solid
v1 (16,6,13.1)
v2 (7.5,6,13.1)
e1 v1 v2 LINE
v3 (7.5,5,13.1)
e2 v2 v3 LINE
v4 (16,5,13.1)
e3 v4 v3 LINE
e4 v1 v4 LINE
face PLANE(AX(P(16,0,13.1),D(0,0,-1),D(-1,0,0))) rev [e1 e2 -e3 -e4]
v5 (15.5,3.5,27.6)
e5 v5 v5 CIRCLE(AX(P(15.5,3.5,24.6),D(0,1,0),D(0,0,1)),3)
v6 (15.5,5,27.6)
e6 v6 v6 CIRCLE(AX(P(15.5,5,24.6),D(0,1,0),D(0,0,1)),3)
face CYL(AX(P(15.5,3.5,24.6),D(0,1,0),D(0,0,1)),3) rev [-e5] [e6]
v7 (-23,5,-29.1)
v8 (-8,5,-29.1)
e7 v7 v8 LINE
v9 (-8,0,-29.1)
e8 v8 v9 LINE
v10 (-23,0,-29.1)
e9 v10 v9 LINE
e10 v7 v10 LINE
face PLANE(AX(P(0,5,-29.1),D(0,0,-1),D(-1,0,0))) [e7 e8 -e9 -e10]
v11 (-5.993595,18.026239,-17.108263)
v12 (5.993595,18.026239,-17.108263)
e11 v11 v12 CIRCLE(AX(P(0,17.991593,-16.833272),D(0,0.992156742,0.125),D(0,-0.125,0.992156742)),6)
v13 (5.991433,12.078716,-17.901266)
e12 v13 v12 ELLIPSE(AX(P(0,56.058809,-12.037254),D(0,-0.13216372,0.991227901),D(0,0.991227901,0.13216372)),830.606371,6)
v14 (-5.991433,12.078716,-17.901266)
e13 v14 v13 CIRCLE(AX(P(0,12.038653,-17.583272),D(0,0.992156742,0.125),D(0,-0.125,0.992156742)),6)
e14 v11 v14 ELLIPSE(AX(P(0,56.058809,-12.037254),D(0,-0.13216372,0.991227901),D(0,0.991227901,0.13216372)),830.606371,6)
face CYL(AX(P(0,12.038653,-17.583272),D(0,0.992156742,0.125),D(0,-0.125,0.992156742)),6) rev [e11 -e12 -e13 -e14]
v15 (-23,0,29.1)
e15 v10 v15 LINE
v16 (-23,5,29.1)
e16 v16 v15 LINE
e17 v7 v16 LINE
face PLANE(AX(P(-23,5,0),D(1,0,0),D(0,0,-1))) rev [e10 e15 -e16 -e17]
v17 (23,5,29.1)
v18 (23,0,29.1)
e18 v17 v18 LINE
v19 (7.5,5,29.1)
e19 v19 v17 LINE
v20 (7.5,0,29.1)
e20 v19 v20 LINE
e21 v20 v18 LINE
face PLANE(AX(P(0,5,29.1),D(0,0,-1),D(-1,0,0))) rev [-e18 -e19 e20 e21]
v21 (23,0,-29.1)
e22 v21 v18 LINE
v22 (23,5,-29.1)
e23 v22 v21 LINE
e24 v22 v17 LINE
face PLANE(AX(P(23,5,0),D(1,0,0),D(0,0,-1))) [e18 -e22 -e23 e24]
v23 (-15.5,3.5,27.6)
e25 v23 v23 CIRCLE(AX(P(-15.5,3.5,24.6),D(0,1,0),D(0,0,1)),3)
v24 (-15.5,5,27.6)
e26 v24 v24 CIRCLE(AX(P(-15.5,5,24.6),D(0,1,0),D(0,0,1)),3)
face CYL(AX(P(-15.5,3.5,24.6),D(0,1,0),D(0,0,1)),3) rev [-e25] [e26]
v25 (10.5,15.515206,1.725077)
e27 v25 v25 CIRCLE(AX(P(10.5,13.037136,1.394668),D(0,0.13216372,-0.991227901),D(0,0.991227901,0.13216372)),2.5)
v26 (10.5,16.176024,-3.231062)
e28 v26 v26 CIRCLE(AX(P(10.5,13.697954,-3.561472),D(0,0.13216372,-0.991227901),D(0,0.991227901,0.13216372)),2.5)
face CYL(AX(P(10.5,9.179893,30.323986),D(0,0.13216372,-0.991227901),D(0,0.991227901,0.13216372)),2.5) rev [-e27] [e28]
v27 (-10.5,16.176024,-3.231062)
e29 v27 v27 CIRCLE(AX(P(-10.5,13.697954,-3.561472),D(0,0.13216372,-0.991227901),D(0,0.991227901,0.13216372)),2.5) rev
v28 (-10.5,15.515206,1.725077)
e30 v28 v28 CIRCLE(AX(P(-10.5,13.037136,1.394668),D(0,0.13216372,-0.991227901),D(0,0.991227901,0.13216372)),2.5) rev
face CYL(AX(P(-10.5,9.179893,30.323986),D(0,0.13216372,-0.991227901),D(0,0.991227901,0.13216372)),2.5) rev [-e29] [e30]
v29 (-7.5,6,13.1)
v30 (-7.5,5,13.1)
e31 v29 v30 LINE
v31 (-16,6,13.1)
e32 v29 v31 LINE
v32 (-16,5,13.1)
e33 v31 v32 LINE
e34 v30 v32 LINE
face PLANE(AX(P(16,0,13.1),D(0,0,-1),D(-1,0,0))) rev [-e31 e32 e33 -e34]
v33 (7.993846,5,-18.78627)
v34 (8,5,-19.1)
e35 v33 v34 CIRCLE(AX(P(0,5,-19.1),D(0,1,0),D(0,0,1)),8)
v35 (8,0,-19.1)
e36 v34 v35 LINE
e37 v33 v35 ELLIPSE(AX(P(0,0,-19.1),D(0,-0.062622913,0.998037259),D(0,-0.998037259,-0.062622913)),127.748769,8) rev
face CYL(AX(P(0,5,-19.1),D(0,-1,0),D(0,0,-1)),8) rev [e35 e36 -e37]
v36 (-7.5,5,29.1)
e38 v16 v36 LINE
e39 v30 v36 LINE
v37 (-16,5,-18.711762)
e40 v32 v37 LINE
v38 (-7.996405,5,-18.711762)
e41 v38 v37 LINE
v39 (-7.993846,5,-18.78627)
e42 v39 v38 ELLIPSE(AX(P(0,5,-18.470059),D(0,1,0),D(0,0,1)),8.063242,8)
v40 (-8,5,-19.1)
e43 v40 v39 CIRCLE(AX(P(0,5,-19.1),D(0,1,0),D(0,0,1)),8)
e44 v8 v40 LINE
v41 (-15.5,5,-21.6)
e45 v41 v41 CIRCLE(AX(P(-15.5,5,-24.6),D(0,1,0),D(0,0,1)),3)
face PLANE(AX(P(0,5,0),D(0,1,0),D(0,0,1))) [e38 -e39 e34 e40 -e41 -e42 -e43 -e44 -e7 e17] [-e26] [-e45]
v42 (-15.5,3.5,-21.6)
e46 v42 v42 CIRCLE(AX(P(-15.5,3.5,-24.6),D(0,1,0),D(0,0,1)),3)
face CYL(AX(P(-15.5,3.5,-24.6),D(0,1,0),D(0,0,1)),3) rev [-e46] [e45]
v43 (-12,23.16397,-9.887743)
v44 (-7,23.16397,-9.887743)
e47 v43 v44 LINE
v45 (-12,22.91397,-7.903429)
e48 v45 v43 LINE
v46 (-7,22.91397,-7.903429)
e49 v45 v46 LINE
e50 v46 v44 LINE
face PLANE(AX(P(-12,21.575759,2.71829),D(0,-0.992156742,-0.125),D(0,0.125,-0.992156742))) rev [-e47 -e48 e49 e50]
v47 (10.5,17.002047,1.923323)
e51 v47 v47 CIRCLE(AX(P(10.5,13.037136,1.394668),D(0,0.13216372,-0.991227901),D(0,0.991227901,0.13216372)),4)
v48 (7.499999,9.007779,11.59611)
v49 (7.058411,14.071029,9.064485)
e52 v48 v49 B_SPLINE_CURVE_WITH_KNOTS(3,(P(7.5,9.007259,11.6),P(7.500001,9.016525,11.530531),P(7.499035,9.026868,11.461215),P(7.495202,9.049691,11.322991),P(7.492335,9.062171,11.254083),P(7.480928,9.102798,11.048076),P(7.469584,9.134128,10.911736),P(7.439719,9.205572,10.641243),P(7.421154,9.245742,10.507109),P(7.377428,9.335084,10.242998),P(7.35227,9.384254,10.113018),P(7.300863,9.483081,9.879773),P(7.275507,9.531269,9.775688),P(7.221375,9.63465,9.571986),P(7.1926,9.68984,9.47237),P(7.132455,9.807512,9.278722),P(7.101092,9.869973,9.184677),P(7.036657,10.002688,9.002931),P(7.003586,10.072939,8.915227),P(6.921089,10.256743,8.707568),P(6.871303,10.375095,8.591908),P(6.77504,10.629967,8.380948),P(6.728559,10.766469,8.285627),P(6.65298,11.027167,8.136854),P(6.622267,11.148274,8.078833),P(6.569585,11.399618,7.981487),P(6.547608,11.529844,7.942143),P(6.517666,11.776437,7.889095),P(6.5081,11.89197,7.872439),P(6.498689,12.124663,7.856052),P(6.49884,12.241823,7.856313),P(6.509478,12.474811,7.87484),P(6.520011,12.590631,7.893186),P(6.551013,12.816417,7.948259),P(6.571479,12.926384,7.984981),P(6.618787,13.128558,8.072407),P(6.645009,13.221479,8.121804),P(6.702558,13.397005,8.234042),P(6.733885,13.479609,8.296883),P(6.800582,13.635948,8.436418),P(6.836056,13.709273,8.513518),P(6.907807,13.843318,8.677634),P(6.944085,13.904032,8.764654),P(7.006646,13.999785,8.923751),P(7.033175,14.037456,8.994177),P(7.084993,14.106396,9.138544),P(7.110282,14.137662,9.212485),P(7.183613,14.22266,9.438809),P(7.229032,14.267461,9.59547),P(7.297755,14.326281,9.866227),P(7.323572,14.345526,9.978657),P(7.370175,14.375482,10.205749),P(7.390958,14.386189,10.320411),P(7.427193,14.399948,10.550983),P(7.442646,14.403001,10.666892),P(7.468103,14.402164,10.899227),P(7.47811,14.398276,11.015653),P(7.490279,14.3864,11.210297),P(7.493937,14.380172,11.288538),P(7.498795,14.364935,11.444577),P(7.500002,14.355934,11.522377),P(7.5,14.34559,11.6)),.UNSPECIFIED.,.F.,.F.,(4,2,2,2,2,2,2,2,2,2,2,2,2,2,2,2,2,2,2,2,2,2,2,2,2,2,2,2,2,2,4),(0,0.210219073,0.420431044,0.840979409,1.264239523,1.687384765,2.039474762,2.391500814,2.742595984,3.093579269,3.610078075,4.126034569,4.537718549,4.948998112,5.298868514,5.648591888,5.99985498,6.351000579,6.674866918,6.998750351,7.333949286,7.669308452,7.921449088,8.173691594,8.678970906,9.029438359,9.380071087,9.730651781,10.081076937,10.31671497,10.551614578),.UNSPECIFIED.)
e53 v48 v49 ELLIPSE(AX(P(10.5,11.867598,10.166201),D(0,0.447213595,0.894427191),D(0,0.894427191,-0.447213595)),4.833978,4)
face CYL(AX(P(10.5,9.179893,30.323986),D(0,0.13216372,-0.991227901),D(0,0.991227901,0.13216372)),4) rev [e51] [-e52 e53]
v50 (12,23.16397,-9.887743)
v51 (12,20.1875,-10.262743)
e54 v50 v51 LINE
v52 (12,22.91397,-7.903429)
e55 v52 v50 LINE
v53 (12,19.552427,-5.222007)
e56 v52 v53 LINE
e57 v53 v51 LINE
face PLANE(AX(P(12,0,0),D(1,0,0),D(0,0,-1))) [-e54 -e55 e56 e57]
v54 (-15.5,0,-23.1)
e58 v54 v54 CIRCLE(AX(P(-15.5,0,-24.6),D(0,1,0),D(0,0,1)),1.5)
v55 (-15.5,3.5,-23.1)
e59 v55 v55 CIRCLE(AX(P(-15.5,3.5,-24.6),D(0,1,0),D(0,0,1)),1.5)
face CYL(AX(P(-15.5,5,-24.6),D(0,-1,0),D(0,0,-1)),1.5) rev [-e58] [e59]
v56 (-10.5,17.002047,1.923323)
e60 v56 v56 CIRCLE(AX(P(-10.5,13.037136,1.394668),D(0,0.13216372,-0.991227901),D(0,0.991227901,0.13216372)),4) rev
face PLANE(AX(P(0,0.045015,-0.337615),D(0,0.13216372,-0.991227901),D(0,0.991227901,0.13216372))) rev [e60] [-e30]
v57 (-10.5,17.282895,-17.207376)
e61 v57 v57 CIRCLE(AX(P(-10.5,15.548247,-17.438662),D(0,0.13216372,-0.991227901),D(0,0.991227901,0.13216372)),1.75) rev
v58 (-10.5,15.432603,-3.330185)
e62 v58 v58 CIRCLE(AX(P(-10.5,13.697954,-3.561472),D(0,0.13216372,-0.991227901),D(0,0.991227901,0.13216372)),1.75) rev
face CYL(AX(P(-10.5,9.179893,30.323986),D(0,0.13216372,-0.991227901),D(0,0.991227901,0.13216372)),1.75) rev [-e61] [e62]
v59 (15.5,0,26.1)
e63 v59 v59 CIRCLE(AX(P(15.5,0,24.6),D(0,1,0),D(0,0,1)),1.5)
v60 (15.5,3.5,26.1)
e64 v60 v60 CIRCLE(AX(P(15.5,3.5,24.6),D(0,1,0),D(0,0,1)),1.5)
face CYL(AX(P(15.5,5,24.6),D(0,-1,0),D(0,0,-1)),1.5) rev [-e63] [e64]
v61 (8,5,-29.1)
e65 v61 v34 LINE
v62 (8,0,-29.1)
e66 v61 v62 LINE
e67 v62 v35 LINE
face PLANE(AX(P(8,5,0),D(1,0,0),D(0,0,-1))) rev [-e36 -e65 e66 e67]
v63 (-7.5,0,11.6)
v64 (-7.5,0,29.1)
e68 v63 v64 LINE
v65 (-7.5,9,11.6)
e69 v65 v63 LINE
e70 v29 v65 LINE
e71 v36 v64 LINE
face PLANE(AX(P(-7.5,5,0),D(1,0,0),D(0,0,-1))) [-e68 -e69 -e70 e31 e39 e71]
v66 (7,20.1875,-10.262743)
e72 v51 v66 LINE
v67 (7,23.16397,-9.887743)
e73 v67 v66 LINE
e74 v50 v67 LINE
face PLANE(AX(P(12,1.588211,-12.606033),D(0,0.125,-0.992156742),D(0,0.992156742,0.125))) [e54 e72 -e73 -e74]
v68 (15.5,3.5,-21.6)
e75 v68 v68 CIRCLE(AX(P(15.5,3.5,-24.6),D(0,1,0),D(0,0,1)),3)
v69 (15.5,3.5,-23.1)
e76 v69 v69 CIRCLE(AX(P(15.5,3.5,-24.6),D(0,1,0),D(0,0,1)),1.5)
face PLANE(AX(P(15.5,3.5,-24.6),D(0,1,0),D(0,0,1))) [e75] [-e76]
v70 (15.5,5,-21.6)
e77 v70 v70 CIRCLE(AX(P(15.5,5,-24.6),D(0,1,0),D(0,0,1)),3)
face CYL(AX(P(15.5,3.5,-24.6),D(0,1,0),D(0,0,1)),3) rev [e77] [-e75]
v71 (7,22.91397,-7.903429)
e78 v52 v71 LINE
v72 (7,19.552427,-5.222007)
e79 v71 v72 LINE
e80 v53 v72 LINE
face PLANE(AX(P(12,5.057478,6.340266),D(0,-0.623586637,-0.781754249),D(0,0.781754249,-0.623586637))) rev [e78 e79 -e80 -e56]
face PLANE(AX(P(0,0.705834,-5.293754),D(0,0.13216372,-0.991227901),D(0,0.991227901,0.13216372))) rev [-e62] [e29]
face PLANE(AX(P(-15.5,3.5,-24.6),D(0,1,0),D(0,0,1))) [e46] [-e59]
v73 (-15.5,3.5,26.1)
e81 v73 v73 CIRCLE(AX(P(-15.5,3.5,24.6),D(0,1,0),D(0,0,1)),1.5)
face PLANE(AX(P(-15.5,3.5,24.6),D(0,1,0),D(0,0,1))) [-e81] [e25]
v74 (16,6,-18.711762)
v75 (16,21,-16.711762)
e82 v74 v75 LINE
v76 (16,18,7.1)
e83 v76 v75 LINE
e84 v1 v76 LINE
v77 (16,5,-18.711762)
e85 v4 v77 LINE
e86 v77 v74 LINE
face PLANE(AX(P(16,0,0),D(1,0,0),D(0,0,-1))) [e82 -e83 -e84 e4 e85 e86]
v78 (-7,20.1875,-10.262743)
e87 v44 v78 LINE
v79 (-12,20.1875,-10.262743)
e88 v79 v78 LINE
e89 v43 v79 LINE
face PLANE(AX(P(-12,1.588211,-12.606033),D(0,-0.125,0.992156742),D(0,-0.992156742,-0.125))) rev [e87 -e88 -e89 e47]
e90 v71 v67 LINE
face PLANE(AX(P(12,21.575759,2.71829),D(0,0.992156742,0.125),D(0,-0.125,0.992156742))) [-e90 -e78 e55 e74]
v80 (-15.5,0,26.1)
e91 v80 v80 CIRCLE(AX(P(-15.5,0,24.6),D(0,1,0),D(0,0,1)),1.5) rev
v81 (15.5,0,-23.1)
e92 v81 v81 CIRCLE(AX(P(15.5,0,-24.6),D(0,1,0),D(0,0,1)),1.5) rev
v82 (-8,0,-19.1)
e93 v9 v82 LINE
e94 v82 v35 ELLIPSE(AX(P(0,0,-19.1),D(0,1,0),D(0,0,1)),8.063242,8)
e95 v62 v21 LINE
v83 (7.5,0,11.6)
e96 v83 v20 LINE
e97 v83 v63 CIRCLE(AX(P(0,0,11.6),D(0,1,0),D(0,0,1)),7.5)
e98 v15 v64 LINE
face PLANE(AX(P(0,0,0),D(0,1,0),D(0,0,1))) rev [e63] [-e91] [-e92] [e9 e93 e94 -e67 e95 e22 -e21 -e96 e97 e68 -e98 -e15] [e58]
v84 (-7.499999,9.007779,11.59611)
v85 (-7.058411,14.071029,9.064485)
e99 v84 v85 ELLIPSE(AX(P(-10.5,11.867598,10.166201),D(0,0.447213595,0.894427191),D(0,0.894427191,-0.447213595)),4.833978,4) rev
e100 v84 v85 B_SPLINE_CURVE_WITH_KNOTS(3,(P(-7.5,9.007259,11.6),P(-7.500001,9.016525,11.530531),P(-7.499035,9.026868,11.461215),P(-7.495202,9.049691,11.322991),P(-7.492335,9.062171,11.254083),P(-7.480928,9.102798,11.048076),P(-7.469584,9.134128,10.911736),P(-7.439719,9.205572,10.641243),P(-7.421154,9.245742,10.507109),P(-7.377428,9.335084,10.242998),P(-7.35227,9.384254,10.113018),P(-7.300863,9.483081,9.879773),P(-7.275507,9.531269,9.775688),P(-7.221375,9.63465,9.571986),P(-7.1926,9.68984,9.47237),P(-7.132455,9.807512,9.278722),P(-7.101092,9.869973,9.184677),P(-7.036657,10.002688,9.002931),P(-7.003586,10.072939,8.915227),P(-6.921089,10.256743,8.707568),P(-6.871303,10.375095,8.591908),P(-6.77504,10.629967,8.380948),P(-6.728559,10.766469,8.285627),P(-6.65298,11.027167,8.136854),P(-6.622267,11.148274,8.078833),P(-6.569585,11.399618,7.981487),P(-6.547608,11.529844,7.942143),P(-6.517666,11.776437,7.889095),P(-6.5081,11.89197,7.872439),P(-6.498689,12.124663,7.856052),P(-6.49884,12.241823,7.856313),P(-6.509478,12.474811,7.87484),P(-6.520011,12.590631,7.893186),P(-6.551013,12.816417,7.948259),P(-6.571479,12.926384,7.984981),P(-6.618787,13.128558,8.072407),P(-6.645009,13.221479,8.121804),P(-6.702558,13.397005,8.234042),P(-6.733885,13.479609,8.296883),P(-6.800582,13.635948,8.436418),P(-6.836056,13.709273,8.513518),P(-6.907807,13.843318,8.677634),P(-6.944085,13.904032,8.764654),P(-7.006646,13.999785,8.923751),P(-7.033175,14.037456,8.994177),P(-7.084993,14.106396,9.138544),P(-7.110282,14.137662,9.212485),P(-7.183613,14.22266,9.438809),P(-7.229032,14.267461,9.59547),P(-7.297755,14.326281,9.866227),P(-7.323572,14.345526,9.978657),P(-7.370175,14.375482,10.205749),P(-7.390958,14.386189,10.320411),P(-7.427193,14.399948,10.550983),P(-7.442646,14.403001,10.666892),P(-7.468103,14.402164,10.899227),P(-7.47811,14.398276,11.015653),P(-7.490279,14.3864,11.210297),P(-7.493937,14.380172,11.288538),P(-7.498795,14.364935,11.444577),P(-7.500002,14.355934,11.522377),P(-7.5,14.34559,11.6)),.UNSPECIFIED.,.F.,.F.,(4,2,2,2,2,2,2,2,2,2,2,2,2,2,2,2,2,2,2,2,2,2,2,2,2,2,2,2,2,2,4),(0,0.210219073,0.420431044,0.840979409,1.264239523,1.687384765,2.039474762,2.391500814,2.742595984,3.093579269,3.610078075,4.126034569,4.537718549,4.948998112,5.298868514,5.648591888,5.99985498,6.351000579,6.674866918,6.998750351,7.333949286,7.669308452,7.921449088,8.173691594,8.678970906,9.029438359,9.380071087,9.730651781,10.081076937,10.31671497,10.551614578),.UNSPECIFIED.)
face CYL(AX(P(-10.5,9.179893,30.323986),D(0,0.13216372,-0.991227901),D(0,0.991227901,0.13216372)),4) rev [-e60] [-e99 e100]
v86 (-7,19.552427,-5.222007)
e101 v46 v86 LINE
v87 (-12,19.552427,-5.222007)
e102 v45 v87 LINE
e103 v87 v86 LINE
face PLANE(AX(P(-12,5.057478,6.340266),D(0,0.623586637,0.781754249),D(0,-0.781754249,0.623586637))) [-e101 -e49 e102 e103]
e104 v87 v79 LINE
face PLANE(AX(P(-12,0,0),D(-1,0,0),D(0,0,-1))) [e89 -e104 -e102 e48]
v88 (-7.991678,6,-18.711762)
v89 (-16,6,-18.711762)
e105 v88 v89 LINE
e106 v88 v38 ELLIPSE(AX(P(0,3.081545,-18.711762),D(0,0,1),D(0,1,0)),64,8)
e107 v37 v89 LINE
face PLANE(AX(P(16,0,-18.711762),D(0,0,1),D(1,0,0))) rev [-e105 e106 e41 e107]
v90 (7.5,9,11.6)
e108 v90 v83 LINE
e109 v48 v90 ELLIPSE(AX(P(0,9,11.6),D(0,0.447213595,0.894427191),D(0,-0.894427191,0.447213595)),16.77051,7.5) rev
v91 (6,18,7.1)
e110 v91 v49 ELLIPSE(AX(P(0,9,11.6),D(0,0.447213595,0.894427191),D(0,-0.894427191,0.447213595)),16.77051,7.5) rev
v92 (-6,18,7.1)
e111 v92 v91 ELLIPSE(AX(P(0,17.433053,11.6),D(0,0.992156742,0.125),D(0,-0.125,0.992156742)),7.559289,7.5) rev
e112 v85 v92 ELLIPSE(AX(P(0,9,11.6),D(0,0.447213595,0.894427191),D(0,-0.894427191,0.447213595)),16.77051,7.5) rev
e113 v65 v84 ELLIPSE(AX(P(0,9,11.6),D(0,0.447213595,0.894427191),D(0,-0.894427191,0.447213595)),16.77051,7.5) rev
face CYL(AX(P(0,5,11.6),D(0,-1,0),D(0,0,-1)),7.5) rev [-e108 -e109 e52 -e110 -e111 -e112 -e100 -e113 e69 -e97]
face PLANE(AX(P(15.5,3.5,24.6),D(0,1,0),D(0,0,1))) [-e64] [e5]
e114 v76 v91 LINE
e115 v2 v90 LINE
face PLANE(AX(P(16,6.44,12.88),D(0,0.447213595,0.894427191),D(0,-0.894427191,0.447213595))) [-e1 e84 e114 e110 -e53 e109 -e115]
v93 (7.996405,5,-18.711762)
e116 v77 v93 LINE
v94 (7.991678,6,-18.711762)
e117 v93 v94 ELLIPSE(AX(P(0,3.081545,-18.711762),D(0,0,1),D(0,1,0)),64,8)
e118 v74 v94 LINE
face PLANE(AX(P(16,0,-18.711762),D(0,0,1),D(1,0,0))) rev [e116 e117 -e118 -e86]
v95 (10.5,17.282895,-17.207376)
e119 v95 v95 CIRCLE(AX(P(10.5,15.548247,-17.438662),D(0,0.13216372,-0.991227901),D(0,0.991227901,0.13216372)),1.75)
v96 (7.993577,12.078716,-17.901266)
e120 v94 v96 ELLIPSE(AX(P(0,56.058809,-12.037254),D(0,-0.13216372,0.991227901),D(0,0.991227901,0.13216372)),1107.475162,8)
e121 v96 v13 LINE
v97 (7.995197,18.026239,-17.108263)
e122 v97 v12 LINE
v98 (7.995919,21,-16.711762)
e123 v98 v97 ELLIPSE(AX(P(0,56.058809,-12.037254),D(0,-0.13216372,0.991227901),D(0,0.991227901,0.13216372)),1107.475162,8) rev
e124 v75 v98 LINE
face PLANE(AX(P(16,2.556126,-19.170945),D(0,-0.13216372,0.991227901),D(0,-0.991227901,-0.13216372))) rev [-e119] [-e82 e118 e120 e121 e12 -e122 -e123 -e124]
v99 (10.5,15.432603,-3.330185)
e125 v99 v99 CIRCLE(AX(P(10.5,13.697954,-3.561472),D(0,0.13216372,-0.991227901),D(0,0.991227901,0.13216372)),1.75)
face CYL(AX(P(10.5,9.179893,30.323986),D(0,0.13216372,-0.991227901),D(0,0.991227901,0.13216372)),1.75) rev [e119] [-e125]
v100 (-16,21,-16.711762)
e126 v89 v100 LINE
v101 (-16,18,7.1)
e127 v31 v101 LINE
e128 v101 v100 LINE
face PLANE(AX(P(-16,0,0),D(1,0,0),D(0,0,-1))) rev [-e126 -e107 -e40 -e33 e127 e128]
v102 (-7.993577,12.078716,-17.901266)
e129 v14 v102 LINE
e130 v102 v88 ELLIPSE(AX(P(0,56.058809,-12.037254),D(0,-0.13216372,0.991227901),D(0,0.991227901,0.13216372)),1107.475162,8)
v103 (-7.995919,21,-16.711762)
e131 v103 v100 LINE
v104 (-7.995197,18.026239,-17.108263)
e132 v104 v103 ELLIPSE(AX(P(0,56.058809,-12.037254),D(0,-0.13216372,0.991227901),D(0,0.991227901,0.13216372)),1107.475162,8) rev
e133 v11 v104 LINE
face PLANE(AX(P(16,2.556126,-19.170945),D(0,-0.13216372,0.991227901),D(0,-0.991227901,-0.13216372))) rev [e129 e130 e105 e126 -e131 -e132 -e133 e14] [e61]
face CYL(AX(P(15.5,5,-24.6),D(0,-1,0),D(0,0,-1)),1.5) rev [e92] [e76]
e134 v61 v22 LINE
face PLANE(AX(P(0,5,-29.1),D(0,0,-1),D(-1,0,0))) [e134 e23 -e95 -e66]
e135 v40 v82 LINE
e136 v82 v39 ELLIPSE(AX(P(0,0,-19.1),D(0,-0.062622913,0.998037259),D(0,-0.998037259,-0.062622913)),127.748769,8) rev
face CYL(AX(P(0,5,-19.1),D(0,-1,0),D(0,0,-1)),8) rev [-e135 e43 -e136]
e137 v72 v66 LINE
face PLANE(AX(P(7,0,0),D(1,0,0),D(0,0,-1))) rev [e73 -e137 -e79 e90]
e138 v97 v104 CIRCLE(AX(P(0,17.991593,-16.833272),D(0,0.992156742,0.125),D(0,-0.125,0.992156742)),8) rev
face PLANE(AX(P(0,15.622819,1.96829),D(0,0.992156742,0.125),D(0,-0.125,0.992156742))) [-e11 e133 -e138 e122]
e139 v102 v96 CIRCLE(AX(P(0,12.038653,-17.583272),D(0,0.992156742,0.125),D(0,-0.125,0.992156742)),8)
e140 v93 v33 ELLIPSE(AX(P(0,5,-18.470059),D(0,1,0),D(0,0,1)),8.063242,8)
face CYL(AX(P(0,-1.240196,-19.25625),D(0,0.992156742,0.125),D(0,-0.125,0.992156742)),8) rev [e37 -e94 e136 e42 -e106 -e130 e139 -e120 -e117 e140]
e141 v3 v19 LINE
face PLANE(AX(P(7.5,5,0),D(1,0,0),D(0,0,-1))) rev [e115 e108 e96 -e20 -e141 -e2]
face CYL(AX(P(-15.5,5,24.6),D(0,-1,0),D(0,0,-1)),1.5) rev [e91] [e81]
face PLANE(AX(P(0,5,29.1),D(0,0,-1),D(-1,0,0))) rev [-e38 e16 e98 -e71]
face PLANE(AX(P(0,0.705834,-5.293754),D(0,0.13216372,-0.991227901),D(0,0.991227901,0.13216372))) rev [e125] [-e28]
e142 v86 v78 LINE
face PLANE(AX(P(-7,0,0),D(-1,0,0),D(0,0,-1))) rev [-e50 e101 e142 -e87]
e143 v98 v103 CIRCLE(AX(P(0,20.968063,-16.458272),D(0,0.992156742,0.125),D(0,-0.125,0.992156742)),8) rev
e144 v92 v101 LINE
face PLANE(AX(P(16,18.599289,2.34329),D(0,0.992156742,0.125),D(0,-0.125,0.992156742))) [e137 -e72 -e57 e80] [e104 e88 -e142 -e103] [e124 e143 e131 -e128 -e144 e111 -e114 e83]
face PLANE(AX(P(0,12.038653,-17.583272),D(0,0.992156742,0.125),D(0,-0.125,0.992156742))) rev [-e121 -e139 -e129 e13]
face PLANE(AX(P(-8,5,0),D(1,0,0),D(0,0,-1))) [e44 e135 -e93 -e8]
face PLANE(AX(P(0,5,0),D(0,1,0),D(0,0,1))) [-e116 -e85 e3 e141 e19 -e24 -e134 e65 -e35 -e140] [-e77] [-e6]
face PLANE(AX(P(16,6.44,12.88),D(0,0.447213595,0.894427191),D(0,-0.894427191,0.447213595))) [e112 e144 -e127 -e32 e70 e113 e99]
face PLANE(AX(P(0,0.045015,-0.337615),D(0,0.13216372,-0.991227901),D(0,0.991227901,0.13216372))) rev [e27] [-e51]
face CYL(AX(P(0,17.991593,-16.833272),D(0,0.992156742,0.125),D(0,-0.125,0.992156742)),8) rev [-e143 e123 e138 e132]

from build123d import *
from build123d.topology import SkipClean

# Parameters (mm, degrees)
SKETCH1_R           = 3
SKETCH1_R_2         = 1.5
BOSS_EXTRUDE1_DEPTH = 5
CUT_EXTRUDE1_START  = 3.5
SKETCH1_3_R         = 3
SKETCH1_3_R_2       = 1.5
CUT_EXTRUDE1_DEPTH  = 1.5
BOSS_EXTRUDE2_DEPTH = 16
BOSS_EXTRUDE3_START = 7
BOSS_EXTRUDE3_DEPTH = 5
SKETCH3_R           = 1.75
CUT_EXTRUDE2_DEPTH  = 58.304165422
CUT_EXTRUDE3_START  = -14
SKETCH3_3_R         = 2.5
SKETCH3_3_R_2       = 1.75
CUT_EXTRUDE3_DEPTH  = 44.304165422
CUT_EXTRUDE4_START  = -19
SKETCH3_4_R         = 4
SKETCH3_4_R_2       = 2.5
CUT_EXTRUDE4_DEPTH  = 39.304165422
CUT_EXTRUDE5_DEPTH  = 44.730761674
CUT_EXTRUDE6_DEPTH  = 3
CUT_EXTRUDE7_START  = 3
CUT_EXTRUDE7_DEPTH  = 6
CUT_EXTRUDE8_START  = 9
CUT_EXTRUDE8_DEPTH  = 12.133821


with BuildPart() as part:
    # Sketch1 → Boss-Extrude1 (new body)
    # profile 1 of 5: a face of its own
    with BuildSketch(Plane(origin=(0, 0, 0), x_dir=(1, 0, 0), z_dir=(0, 1, 0))):
        with BuildLine():
            ThreePointArc((7.5, -11.6), (0, -4.1), (-7.5, -11.6))
            Line((-7.5, -11.6), (-7.5, -29.1))
            Line((-7.5, -29.1), (-23, -29.1))
            Line((-23, -29.1), (-23, 29.1))
            Line((-23, 29.1), (-8, 29.1))
            Line((-8, 29.1), (-8, 19.1))
            ThreePointArc((-8, 19.1), (0, 11.1), (8, 19.1))
            Line((8, 19.1), (8, 29.1))
            Line((8, 29.1), (23, 29.1))
            Line((23, 29.1), (23, -29.1))
            Line((23, -29.1), (7.5, -29.1))
            Line((7.5, -29.1), (7.5, -11.6))
        make_face()
        with Locations((15.5, -24.6)):
            Circle(SKETCH1_R, mode=Mode.SUBTRACT)
        with Locations((-15.5, 24.6)):
            Circle(SKETCH1_R, mode=Mode.SUBTRACT)
        with Locations((-15.5, -24.6)):
            Circle(SKETCH1_R, mode=Mode.SUBTRACT)
        with Locations((15.5, 24.6)):
            Circle(SKETCH1_R, mode=Mode.SUBTRACT)
    # profile 2 of 5: a face of its own
    with BuildSketch(Plane(origin=(0, 0, 0), x_dir=(1, 0, 0), z_dir=(0, 1, 0))):
        with Locations((-15.5, -24.6)):
            Circle(SKETCH1_R)
        with Locations(Location((-15.5, -24.6, 0), (0, 0, 270))):
            Circle(SKETCH1_R_2, mode=Mode.SUBTRACT)
    # profile 3 of 5: a face of its own
    with BuildSketch(Plane(origin=(0, 0, 0), x_dir=(1, 0, 0), z_dir=(0, 1, 0))):
        with Locations((15.5, -24.6)):
            Circle(SKETCH1_R)
        with Locations(Location((15.5, -24.6, 0), (0, 0, 270))):
            Circle(SKETCH1_R_2, mode=Mode.SUBTRACT)
    # profile 4 of 5: a face of its own
    with BuildSketch(Plane(origin=(0, 0, 0), x_dir=(1, 0, 0), z_dir=(0, 1, 0))):
        with Locations((15.5, 24.6)):
            Circle(SKETCH1_R)
        with Locations(Location((15.5, 24.6, 0), (0, 0, 270))):
            Circle(SKETCH1_R_2, mode=Mode.SUBTRACT)
    # profile 5 of 5: a face of its own
    with BuildSketch(Plane(origin=(0, 0, 0), x_dir=(1, 0, 0), z_dir=(0, 1, 0))):
        with Locations((-15.5, 24.6)):
            Circle(SKETCH1_R)
        with Locations(Location((-15.5, 24.6, 0), (0, 0, 270))):
            Circle(SKETCH1_R_2, mode=Mode.SUBTRACT)
    extrude(amount=BOSS_EXTRUDE1_DEPTH)

    # Sketch1<3> → Cut-Extrude1 (cut)
    # profile 1 of 4: a face of its own
    with BuildSketch(Plane(origin=(0, 0, 0), x_dir=(1, 0, 0), z_dir=(0, 1, 0)).offset(CUT_EXTRUDE1_START)):
        with Locations(Location((-15.5, -24.6, 0), (0, 0, 270))):
            Circle(SKETCH1_3_R)
        with Locations(Location((-15.5, -24.6, 0), (0, 0, 270))):
            Circle(SKETCH1_3_R_2, mode=Mode.SUBTRACT)
    # profile 2 of 4: a face of its own
    with BuildSketch(Plane(origin=(0, 0, 0), x_dir=(1, 0, 0), z_dir=(0, 1, 0)).offset(CUT_EXTRUDE1_START)):
        with Locations(Location((15.5, -24.6, 0), (0, 0, 270))):
            Circle(SKETCH1_3_R)
        with Locations(Location((15.5, -24.6, 0), (0, 0, 270))):
            Circle(SKETCH1_3_R_2, mode=Mode.SUBTRACT)
    # profile 3 of 4: a face of its own
    with BuildSketch(Plane(origin=(0, 0, 0), x_dir=(1, 0, 0), z_dir=(0, 1, 0)).offset(CUT_EXTRUDE1_START)):
        with Locations(Location((15.5, 24.6, 0), (0, 0, 270))):
            Circle(SKETCH1_3_R)
        with Locations(Location((15.5, 24.6, 0), (0, 0, 270))):
            Circle(SKETCH1_3_R_2, mode=Mode.SUBTRACT)
    # profile 4 of 4: a face of its own
    with BuildSketch(Plane(origin=(0, 0, 0), x_dir=(1, 0, 0), z_dir=(0, 1, 0)).offset(CUT_EXTRUDE1_START)):
        with Locations(Location((-15.5, 24.6, 0), (0, 0, 270))):
            Circle(SKETCH1_3_R)
        with Locations(Location((-15.5, 24.6, 0), (0, 0, 270))):
            Circle(SKETCH1_3_R_2, mode=Mode.SUBTRACT)
    extrude(amount=CUT_EXTRUDE1_DEPTH, mode=Mode.SUBTRACT)

    # Sketch2 → Boss-Extrude2 (add, symmetric)
    with BuildSketch(Plane(origin=(0, 0, 0), x_dir=(0, 0, -1), z_dir=(1, 0, 0))):
        Polygon((-13.1, 6), (-13.1, 5), (18.7117618, 5), (18.7117618, 6), (16.7117618, 21), (-7.1, 18), align=None)
    extrude(amount=BOSS_EXTRUDE2_DEPTH, both=True)

    # Sketch2<3> → Boss-Extrude3 (add)
    with BuildSketch(Plane(origin=(0, 0, 0), x_dir=(0, 0, -1), z_dir=(1, 0, 0)).offset(BOSS_EXTRUDE3_START)):
        Polygon((7.903429496, 22.913970225), (5.222006954, 19.552426955), (10.262742979, 20.1875), (9.887742979, 23.163970225), align=None)
    boss_extrude3 = extrude(amount=BOSS_EXTRUDE3_DEPTH)

    # Mirror1: Boss-Extrude3 across plane
    add(boss_extrude3.mirror(Plane(origin=(0, 0, 0), x_dir=(0, 0, 1), z_dir=(1, 0, 0))))

    # Sketch3 → Cut-Extrude2 (cut, through all)
    with BuildSketch(Plane(origin=(0, 2.556126, -19.170945), x_dir=(-1, 0, 0), z_dir=(0, 0.13216372009101815, -0.9912279006826348))):
        with Locations(Location((10.5, 13.107097306, 0), (0, 0, 90))):
            Circle(SKETCH3_R)
        with Locations(Location((-10.5, 13.107097306, 0), (0, 0, 90))):
            Circle(SKETCH3_R)
    extrude(amount=-CUT_EXTRUDE2_DEPTH, mode=Mode.SUBTRACT)

    # Sketch3<3> → Cut-Extrude3 (cut, through all)
    # profile 1 of 2: a face of its own
    with BuildSketch(Plane(origin=(0, 2.556126, -19.170945), x_dir=(-1, 0, 0), z_dir=(0, 0.13216372009101815, -0.9912279006826348)).offset(CUT_EXTRUDE3_START)):
        with Locations(Location((10.5, 13.107097306, 0), (0, 0, 90))):
            Circle(SKETCH3_3_R)
        with Locations(Location((10.5, 13.107097306, 0), (0, 0, 90))):
            Circle(SKETCH3_3_R_2, mode=Mode.SUBTRACT)
    # profile 2 of 2: a face of its own
    with BuildSketch(Plane(origin=(0, 2.556126, -19.170945), x_dir=(-1, 0, 0), z_dir=(0, 0.13216372009101815, -0.9912279006826348)).offset(CUT_EXTRUDE3_START)):
        with Locations(Location((-10.5, 13.107097306, 0), (0, 0, 90))):
            Circle(SKETCH3_3_R)
        with Locations(Location((-10.5, 13.107097306, 0), (0, 0, 90))):
            Circle(SKETCH3_3_R_2, mode=Mode.SUBTRACT)
    extrude(amount=-CUT_EXTRUDE3_DEPTH, mode=Mode.SUBTRACT)

    # Sketch3<4> → Cut-Extrude4 (cut, through all)
    # profile 1 of 2: a face of its own
    with BuildSketch(Plane(origin=(0, 2.556126, -19.170945), x_dir=(-1, 0, 0), z_dir=(0, 0.13216372009101815, -0.9912279006826348)).offset(CUT_EXTRUDE4_START)):
        with Locations(Location((10.5, 13.107097306, 0), (0, 0, 90))):
            Circle(SKETCH3_4_R)
        with Locations(Location((10.5, 13.107097306, 0), (0, 0, 90))):
            Circle(SKETCH3_4_R_2, mode=Mode.SUBTRACT)
    # profile 2 of 2: a face of its own
    with BuildSketch(Plane(origin=(0, 2.556126, -19.170945), x_dir=(-1, 0, 0), z_dir=(0, 0.13216372009101815, -0.9912279006826348)).offset(CUT_EXTRUDE4_START)):
        with Locations(Location((-10.5, 13.107097306, 0), (0, 0, 90))):
            Circle(SKETCH3_4_R)
        with Locations(Location((-10.5, 13.107097306, 0), (0, 0, 90))):
            Circle(SKETCH3_4_R_2, mode=Mode.SUBTRACT)
    extrude(amount=-CUT_EXTRUDE4_DEPTH, mode=Mode.SUBTRACT)

    # Sketch1<4> → Cut-Extrude5 (cut, through all)
    with SkipClean():  # the faces are left unmerged after this step: merging them gives an invalid solid
        with BuildSketch(Plane(origin=(0, 0, 0), x_dir=(1, 0, 0), z_dir=(0, 1, 0))):
            with BuildLine():
                Line((7.5, -11.6), (7.5, -29.1))
                Line((7.5, -29.1), (-7.5, -29.1))
                Line((-7.5, -29.1), (-7.5, -11.6))
                ThreePointArc((-7.5, -11.6), (0, -4.1), (7.5, -11.6))
            make_face()
        extrude(amount=CUT_EXTRUDE5_DEPTH, mode=Mode.SUBTRACT)
    add(part.part.scale(1), mode=Mode.REPLACE)  # the faces are merged on a copy

    # Sketch4 → Cut-Extrude6 (cut)
    with BuildSketch(Plane(origin=(0, 18.74632135, 1.176257932), x_dir=(1, 0, 0), z_dir=(0, -0.9921567416492215, -0.12499999999999996))):
        with BuildLine():
            Line((5.994557793, -18.029429203), (-5.994557793, -18.029429203))
            ThreePointArc((-5.994557793, -18.029429203), (0, -23.773935834), (5.994557793, -18.029429203))
        make_face()
        with BuildLine():
            ThreePointArc((6, -17.773935834), (-0.127775662, -11.77529654), (-5.994557793, -18.029429203))
            Line((-5.994557793, -18.029429203), (5.994557793, -18.029429203))
            ThreePointArc((5.994557793, -18.029429203), (5.998639294, -17.901711496), (6, -17.773935834))
        make_face()
        with BuildLine():
            ThreePointArc((7.995919155, -18.029429203), (7.998979724, -17.901698812), (8, -17.773935834))
            ThreePointArc((8, -17.773935834), (-0.127762979, -9.77495611), (-7.995919155, -18.029429203))
            Line((-7.995919155, -18.029429203), (-5.994557793, -18.029429203))
            ThreePointArc((-5.994557793, -18.029429203), (-0.127775662, -11.77529654), (6, -17.773935834))
            ThreePointArc((6, -17.773935834), (5.998639294, -17.901711496), (5.994557793, -18.029429203))
            Line((5.994557793, -18.029429203), (7.995919155, -18.029429203))
        make_face()
        with BuildLine():
            Line((-5.994557793, -18.029429203), (-7.995919155, -18.029429203))
            ThreePointArc((-7.995919155, -18.029429203), (0, -25.773935834), (7.995919155, -18.029429203))
            Line((7.995919155, -18.029429203), (5.994557793, -18.029429203))
            ThreePointArc((5.994557793, -18.029429203), (0, -23.773935834), (-5.994557793, -18.029429203))
        make_face()
    extrude(amount=CUT_EXTRUDE6_DEPTH, mode=Mode.SUBTRACT)

    # Sketch4<3> → Cut-Extrude7 (cut)
    with BuildSketch(Plane(origin=(0, 18.74632135, 1.176257932), x_dir=(1, 0, 0), z_dir=(0, -0.9921567416492215, -0.12499999999999996)).offset(CUT_EXTRUDE7_START)):
        with BuildLine():
            Line((5.994557793, -18.029429203), (-5.994557793, -18.029429203))
            ThreePointArc((-5.994557793, -18.029429203), (0, -23.773935834), (5.994557793, -18.029429203))
        make_face()
        with BuildLine():
            ThreePointArc((6, -17.773935834), (-0.127775662, -11.77529654), (-5.994557793, -18.029429203))
            Line((-5.994557793, -18.029429203), (5.994557793, -18.029429203))
            ThreePointArc((5.994557793, -18.029429203), (5.998639294, -17.901711496), (6, -17.773935834))
        make_face()
    extrude(amount=CUT_EXTRUDE7_DEPTH, mode=Mode.SUBTRACT)

    # Sketch4<4> → Cut-Extrude8 (cut)
    with BuildSketch(Plane(origin=(0, 18.74632135, 1.176257932), x_dir=(1, 0, 0), z_dir=(0, -0.9921567416492215, -0.12499999999999996)).offset(CUT_EXTRUDE8_START)):
        with BuildLine():
            Line((5.994557793, -18.029429203), (-5.994557793, -18.029429203))
            ThreePointArc((-5.994557793, -18.029429203), (0, -23.773935834), (5.994557793, -18.029429203))
        make_face()
        with BuildLine():
            ThreePointArc((6, -17.773935834), (-0.127775662, -11.77529654), (-5.994557793, -18.029429203))
            Line((-5.994557793, -18.029429203), (5.994557793, -18.029429203))
            ThreePointArc((5.994557793, -18.029429203), (5.998639294, -17.901711496), (6, -17.773935834))
        make_face()
        with BuildLine():
            ThreePointArc((7.995919155, -18.029429203), (7.998979724, -17.901698812), (8, -17.773935834))
            ThreePointArc((8, -17.773935834), (-0.127762979, -9.77495611), (-7.995919155, -18.029429203))
            Line((-7.995919155, -18.029429203), (-5.994557793, -18.029429203))
            ThreePointArc((-5.994557793, -18.029429203), (-0.127775662, -11.77529654), (6, -17.773935834))
            ThreePointArc((6, -17.773935834), (5.998639294, -17.901711496), (5.994557793, -18.029429203))
            Line((5.994557793, -18.029429203), (7.995919155, -18.029429203))
        make_face()
        with BuildLine():
            Line((-5.994557793, -18.029429203), (-7.995919155, -18.029429203))
            ThreePointArc((-7.995919155, -18.029429203), (0, -25.773935834), (7.995919155, -18.029429203))
            Line((7.995919155, -18.029429203), (5.994557793, -18.029429203))
            ThreePointArc((5.994557793, -18.029429203), (0, -23.773935834), (-5.994557793, -18.029429203))
        make_face()
    extrude(amount=CUT_EXTRUDE8_DEPTH, mode=Mode.SUBTRACT)


solid = part.part
